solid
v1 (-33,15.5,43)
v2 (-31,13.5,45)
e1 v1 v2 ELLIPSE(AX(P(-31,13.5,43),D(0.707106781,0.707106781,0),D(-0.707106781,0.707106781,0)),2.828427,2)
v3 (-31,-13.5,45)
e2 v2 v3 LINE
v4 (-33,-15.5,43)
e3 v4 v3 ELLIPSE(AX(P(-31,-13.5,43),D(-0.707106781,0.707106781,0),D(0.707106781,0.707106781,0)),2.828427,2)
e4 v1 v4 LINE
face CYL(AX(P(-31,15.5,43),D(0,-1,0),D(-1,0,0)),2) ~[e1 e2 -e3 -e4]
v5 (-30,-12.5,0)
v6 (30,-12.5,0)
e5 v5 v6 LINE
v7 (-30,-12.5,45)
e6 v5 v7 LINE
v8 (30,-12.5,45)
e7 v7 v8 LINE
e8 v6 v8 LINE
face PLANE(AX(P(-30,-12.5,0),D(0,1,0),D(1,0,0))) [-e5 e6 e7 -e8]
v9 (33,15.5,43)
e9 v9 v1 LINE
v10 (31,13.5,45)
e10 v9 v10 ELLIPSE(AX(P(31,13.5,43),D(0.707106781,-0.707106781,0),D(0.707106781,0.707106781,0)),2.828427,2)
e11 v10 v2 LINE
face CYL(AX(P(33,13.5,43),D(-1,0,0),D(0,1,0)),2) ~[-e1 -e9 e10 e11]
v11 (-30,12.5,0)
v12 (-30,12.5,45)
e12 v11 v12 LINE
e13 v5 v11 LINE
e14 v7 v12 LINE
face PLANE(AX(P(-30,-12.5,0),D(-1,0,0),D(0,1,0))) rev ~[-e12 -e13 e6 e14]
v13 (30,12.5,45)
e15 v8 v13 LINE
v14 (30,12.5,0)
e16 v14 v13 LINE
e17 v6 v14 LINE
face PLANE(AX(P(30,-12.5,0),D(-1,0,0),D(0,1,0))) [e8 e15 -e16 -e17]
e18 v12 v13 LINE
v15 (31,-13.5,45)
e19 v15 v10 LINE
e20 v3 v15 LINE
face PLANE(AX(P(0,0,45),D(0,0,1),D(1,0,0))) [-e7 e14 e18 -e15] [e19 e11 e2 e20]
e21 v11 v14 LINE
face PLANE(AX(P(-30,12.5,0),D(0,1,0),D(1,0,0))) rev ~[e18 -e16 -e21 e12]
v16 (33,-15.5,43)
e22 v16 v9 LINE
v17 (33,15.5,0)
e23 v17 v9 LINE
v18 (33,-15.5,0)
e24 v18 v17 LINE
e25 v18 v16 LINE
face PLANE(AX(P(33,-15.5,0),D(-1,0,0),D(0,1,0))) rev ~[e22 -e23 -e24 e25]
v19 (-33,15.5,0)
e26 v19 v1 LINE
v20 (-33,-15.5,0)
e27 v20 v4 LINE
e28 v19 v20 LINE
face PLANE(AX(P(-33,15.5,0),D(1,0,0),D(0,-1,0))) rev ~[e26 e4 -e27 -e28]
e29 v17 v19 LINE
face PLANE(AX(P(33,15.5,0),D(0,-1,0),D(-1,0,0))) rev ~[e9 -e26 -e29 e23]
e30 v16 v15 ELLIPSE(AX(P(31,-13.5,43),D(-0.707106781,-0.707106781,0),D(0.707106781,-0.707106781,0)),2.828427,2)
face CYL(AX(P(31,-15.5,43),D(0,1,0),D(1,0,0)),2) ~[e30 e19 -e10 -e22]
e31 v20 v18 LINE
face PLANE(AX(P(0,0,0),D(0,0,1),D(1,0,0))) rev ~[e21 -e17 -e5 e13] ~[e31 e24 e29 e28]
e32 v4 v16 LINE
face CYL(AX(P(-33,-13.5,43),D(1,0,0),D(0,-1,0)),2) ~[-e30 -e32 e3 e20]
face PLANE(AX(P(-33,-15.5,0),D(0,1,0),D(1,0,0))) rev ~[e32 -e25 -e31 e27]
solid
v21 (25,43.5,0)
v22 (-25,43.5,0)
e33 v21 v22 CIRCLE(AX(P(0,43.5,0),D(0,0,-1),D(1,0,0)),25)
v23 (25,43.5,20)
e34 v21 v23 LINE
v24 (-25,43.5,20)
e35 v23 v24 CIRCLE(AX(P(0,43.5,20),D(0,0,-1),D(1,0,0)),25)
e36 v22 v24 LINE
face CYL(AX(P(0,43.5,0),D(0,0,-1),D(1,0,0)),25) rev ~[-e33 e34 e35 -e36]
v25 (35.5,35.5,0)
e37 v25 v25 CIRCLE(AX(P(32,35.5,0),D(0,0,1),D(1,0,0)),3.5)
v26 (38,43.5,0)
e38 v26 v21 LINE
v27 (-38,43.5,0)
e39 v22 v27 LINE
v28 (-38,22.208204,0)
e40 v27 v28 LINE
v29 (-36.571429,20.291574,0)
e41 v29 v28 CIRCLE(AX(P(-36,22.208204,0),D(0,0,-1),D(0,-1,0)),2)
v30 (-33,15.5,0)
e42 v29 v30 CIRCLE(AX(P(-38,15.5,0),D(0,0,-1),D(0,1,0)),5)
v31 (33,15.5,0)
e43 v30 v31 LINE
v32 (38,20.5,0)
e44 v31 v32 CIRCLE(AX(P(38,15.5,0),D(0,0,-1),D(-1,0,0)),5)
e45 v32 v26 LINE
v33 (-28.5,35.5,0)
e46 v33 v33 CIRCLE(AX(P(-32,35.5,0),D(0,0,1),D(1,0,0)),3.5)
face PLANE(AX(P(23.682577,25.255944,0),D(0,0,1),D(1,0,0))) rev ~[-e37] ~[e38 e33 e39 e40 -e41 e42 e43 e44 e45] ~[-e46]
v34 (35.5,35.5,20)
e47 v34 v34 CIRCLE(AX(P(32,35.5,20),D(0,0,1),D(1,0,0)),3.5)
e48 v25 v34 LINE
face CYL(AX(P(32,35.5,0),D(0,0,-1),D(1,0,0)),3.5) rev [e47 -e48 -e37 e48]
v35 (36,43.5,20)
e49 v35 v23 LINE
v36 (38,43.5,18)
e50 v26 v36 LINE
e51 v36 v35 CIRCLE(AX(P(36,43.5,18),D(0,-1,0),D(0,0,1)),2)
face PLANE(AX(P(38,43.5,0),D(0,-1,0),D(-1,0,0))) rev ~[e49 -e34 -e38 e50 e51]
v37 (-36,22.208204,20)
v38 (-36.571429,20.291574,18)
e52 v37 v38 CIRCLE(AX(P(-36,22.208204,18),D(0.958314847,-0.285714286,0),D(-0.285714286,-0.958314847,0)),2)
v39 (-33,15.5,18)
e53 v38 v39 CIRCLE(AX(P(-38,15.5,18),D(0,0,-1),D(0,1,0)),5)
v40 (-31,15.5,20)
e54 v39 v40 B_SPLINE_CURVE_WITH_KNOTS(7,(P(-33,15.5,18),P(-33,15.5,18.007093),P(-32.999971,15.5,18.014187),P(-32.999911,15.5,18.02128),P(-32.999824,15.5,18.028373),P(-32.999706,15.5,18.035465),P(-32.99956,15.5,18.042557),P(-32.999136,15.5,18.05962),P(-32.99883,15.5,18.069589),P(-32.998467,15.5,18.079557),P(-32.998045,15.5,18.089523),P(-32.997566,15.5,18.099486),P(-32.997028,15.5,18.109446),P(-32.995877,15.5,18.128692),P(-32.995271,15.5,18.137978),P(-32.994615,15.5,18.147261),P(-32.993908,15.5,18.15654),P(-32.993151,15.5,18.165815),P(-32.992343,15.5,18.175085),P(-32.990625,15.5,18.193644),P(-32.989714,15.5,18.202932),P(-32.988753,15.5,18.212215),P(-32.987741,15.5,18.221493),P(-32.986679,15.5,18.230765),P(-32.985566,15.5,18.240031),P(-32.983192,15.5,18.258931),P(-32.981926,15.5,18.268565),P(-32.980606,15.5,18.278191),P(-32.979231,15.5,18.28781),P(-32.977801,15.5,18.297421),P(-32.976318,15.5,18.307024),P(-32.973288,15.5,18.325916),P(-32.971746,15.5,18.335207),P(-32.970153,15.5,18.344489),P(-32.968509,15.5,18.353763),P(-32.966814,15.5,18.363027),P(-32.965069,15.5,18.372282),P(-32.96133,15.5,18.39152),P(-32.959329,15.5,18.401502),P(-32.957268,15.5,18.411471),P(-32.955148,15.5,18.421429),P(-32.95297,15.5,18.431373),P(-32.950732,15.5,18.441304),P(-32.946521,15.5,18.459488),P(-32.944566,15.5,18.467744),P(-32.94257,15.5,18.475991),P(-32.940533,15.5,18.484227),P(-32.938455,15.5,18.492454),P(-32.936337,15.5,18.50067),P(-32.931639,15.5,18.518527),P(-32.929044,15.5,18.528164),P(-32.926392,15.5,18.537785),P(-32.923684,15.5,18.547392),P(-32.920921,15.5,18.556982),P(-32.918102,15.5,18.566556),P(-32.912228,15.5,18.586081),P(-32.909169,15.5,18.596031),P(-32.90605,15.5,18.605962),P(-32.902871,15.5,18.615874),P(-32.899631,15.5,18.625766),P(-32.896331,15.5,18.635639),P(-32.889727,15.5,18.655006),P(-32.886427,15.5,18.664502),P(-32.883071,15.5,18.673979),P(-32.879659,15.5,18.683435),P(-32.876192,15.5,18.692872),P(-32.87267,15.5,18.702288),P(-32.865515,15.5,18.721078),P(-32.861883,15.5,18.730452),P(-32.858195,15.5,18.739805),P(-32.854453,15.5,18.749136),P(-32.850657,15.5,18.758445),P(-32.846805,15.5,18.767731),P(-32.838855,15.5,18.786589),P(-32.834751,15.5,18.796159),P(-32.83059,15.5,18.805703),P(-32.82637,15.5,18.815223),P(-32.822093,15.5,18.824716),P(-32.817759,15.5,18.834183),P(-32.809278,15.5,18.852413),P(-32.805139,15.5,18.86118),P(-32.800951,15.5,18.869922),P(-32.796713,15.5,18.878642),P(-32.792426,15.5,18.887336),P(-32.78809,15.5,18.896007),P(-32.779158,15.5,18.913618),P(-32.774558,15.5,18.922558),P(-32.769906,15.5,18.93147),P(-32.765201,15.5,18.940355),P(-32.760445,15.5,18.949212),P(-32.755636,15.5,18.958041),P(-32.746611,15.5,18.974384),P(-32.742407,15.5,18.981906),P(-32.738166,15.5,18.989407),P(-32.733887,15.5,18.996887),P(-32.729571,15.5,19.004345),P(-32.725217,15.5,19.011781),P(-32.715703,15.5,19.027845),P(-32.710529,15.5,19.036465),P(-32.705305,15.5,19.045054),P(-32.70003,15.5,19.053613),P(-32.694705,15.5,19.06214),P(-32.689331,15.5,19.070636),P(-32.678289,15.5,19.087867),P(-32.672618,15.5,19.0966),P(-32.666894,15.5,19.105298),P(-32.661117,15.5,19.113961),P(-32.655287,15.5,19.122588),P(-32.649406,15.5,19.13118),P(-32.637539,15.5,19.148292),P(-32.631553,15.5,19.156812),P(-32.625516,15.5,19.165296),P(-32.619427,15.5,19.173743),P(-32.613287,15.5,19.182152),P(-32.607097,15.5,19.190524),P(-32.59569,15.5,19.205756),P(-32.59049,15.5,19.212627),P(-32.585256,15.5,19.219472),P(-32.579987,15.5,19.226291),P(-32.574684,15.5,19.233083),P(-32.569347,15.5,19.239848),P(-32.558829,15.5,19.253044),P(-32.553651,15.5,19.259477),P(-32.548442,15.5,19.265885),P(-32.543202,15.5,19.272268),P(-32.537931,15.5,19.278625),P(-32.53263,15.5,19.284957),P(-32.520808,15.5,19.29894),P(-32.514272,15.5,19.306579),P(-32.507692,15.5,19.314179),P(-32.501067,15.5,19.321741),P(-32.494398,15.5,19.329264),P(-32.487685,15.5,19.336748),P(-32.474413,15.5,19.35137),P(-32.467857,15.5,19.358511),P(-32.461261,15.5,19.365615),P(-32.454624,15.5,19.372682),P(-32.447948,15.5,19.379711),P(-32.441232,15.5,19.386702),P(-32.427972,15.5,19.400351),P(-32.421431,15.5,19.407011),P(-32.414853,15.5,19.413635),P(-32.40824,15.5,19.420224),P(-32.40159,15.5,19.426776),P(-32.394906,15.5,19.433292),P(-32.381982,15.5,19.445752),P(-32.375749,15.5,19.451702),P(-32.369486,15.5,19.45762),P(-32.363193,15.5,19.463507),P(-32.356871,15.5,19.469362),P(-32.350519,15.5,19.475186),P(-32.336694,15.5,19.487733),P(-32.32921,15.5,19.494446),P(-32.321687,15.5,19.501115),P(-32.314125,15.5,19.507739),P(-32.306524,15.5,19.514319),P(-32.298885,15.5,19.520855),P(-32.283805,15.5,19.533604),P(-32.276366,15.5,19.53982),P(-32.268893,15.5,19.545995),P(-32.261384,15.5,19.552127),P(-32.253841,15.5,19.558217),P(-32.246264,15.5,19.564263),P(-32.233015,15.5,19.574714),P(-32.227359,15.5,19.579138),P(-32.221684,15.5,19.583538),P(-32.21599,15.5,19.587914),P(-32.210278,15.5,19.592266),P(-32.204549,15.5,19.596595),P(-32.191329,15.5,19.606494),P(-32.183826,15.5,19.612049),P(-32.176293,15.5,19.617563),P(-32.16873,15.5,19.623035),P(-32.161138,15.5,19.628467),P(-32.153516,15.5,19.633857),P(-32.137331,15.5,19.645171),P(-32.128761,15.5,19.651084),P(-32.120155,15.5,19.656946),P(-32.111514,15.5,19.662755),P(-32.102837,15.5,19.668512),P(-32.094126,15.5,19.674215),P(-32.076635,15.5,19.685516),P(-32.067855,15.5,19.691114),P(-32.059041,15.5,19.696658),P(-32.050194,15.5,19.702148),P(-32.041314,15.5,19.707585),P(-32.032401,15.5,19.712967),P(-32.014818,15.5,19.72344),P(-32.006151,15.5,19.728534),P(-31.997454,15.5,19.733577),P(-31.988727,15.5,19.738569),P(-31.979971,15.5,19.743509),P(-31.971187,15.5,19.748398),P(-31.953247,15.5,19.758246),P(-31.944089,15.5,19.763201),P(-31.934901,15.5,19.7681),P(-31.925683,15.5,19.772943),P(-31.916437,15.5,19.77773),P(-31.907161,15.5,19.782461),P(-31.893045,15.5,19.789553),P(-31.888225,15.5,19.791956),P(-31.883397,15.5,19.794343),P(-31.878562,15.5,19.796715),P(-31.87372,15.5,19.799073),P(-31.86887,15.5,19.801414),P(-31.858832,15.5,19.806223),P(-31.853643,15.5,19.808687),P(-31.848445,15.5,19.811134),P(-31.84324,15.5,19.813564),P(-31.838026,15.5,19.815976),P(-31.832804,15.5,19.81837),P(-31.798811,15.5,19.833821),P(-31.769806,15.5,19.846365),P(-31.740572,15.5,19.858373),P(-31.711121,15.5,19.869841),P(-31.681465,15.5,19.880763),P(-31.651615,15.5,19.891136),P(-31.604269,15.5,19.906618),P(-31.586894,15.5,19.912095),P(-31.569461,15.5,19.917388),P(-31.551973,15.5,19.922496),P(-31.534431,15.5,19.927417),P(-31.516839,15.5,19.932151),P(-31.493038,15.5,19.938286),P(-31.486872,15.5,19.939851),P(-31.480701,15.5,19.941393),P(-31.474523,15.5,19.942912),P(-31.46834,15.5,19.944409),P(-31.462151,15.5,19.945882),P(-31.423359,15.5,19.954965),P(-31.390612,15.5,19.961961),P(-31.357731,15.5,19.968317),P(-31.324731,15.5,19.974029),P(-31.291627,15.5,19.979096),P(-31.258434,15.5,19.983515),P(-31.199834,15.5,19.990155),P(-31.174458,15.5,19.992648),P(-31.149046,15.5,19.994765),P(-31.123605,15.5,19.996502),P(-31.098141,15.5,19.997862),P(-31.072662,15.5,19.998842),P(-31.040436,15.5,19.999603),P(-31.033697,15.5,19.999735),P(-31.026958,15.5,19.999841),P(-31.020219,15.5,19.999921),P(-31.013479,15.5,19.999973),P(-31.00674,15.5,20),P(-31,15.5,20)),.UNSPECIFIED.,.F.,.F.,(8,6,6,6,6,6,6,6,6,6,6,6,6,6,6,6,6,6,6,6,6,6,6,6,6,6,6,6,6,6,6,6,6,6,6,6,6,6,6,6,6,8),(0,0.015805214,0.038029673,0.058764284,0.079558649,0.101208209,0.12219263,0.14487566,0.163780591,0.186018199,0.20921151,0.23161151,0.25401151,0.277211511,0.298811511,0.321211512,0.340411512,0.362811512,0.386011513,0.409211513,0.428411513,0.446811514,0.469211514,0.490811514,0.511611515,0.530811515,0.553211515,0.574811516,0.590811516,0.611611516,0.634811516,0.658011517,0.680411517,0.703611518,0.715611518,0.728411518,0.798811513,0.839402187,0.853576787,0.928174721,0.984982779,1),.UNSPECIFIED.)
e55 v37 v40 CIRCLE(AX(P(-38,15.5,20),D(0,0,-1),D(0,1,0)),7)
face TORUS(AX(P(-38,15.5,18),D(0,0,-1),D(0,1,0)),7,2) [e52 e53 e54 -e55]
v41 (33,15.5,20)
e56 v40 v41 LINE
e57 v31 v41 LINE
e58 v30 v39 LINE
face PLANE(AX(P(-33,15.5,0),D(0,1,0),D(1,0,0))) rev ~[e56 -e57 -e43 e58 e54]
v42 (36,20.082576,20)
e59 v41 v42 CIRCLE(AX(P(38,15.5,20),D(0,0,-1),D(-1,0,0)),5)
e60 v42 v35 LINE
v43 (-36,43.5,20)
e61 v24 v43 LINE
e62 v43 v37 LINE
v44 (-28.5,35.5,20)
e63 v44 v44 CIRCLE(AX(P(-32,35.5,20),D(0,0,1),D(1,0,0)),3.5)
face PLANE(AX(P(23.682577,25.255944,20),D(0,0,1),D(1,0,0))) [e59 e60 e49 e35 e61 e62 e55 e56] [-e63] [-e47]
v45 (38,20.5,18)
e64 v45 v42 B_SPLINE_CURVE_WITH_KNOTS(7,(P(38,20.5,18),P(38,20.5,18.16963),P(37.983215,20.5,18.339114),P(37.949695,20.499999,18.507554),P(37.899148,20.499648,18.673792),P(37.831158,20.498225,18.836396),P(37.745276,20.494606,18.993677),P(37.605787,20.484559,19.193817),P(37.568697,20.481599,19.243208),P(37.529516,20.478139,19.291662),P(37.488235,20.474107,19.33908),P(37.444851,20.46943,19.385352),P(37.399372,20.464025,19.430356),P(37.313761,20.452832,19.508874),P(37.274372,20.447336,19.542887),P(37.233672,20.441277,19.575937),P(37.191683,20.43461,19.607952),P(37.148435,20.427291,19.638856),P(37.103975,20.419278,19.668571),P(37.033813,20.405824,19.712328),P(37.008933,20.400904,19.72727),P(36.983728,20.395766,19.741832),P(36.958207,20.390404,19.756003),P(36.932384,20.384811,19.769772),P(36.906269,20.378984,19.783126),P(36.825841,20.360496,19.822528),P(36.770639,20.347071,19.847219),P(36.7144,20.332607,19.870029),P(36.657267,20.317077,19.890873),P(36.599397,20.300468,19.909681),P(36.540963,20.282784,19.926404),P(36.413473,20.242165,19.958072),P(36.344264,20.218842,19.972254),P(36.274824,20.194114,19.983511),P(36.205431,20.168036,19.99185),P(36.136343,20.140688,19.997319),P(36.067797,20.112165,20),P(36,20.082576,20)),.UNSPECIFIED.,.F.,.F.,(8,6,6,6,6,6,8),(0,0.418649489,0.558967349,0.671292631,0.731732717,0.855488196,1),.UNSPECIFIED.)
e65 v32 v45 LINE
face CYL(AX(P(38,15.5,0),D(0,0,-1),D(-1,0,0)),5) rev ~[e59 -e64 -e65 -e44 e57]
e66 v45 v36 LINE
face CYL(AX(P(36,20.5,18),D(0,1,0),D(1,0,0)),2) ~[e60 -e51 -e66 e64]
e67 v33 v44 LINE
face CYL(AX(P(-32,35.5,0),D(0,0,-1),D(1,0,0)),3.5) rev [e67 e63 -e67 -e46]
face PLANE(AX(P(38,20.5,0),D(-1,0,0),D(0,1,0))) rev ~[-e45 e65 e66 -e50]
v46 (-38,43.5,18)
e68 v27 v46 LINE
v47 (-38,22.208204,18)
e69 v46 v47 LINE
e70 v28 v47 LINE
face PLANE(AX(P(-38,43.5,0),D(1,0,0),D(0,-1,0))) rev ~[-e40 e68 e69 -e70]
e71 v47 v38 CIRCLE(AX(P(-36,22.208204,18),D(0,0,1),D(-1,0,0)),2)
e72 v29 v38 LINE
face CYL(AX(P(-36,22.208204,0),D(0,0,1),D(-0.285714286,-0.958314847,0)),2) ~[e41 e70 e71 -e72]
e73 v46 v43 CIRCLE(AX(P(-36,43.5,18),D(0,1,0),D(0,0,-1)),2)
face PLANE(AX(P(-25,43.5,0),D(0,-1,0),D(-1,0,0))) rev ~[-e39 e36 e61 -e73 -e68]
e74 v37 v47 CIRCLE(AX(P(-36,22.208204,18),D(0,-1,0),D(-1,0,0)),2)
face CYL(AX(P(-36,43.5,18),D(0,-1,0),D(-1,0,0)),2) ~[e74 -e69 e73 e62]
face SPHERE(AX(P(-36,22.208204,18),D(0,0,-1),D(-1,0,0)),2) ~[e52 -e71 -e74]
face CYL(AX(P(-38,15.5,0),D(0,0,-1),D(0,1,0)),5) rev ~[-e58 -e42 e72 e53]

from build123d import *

# Parameters (mm, degrees)
F0_W     = 60
F0_H     = 25
F1_DEPTH = 45
F0_R     = 3.5
F2_DEPTH = 20
F4_R     = 2
F4_2_R   = 2


# Not quite as in the source:
# - a feature of the source that left no trace in its solid (it failed there, or was rolled back) is left out


with BuildPart() as f1:
    # F0 (on Top) → F1 (new body)
    with BuildSketch(Plane.XY):
        Polygon((-33, -15.5), (33, -15.5), (33, 15.5), (0, 15.5), (-33, 15.5), align=None)
        Rectangle(F0_W, F0_H, mode=Mode.SUBTRACT)
    extrude(amount=F1_DEPTH)

    # F4#2
    f4_2_edges = [f1.edges().sort_by_distance(p)[0] for p in [
        (0, -15.5, 45),
        (33, 0, 45),
        (0, 15.5, 45),
        (-33, 0, 45),
    ]]
    fillet(f4_2_edges, radius=F4_2_R)


with BuildPart() as f2:
    # F0 (on Top) → F2 (new body)
    with BuildSketch(Plane.XY):
        with BuildLine():
            Line((0, 15.5), (33, 15.5))
            ThreePointArc((33, 15.5), (34.4644660941, 19.0355339059), (38, 20.5))
            Line((38, 20.5), (38, 43.5))
            Line((38, 43.5), (28, 43.5))
            ThreePointArc((28, 43.5), (19.7989898732, 23.7010101268), (0, 15.5))
        make_face()
        with Locations((32, 35.5)):
            Circle(F0_R, mode=Mode.SUBTRACT)
        with BuildLine():
            ThreePointArc((-28, 43.5), (-19.7989898732, 23.7010101268), (0, 15.5))
            ThreePointArc((0, 15.5), (19.7989898732, 23.7010101268), (28, 43.5))
            Line((28, 43.5), (25, 43.5))
            ThreePointArc((25, 43.5), (0, 18.5), (-25, 43.5))
            Line((-25, 43.5), (-28, 43.5))
        make_face()
        with BuildLine():
            ThreePointArc((-38, 20.5), (-34.4644660941, 19.0355339059), (-33, 15.5))
            Line((-33, 15.5), (0, 15.5))
            ThreePointArc((0, 15.5), (-19.7989898732, 23.7010101268), (-28, 43.5))
            Line((-28, 43.5), (-38, 43.5))
            Line((-38, 43.5), (-38, 20.5))
        make_face()
        with Locations((-32, 35.5)):
            Circle(F0_R, mode=Mode.SUBTRACT)
    extrude(amount=F2_DEPTH)

    # F4
    f4_edges = [f2.edges().sort_by_distance(p)[0] for p in [
        (-38, 20.5, 10),
        (38, 32, 20),
        (-38, 32, 20),
        (-34.464466, 19.035534, 20),
    ]]
    fillet(f4_edges, radius=F4_R)


solid = Compound([f1.part, f2.part])
